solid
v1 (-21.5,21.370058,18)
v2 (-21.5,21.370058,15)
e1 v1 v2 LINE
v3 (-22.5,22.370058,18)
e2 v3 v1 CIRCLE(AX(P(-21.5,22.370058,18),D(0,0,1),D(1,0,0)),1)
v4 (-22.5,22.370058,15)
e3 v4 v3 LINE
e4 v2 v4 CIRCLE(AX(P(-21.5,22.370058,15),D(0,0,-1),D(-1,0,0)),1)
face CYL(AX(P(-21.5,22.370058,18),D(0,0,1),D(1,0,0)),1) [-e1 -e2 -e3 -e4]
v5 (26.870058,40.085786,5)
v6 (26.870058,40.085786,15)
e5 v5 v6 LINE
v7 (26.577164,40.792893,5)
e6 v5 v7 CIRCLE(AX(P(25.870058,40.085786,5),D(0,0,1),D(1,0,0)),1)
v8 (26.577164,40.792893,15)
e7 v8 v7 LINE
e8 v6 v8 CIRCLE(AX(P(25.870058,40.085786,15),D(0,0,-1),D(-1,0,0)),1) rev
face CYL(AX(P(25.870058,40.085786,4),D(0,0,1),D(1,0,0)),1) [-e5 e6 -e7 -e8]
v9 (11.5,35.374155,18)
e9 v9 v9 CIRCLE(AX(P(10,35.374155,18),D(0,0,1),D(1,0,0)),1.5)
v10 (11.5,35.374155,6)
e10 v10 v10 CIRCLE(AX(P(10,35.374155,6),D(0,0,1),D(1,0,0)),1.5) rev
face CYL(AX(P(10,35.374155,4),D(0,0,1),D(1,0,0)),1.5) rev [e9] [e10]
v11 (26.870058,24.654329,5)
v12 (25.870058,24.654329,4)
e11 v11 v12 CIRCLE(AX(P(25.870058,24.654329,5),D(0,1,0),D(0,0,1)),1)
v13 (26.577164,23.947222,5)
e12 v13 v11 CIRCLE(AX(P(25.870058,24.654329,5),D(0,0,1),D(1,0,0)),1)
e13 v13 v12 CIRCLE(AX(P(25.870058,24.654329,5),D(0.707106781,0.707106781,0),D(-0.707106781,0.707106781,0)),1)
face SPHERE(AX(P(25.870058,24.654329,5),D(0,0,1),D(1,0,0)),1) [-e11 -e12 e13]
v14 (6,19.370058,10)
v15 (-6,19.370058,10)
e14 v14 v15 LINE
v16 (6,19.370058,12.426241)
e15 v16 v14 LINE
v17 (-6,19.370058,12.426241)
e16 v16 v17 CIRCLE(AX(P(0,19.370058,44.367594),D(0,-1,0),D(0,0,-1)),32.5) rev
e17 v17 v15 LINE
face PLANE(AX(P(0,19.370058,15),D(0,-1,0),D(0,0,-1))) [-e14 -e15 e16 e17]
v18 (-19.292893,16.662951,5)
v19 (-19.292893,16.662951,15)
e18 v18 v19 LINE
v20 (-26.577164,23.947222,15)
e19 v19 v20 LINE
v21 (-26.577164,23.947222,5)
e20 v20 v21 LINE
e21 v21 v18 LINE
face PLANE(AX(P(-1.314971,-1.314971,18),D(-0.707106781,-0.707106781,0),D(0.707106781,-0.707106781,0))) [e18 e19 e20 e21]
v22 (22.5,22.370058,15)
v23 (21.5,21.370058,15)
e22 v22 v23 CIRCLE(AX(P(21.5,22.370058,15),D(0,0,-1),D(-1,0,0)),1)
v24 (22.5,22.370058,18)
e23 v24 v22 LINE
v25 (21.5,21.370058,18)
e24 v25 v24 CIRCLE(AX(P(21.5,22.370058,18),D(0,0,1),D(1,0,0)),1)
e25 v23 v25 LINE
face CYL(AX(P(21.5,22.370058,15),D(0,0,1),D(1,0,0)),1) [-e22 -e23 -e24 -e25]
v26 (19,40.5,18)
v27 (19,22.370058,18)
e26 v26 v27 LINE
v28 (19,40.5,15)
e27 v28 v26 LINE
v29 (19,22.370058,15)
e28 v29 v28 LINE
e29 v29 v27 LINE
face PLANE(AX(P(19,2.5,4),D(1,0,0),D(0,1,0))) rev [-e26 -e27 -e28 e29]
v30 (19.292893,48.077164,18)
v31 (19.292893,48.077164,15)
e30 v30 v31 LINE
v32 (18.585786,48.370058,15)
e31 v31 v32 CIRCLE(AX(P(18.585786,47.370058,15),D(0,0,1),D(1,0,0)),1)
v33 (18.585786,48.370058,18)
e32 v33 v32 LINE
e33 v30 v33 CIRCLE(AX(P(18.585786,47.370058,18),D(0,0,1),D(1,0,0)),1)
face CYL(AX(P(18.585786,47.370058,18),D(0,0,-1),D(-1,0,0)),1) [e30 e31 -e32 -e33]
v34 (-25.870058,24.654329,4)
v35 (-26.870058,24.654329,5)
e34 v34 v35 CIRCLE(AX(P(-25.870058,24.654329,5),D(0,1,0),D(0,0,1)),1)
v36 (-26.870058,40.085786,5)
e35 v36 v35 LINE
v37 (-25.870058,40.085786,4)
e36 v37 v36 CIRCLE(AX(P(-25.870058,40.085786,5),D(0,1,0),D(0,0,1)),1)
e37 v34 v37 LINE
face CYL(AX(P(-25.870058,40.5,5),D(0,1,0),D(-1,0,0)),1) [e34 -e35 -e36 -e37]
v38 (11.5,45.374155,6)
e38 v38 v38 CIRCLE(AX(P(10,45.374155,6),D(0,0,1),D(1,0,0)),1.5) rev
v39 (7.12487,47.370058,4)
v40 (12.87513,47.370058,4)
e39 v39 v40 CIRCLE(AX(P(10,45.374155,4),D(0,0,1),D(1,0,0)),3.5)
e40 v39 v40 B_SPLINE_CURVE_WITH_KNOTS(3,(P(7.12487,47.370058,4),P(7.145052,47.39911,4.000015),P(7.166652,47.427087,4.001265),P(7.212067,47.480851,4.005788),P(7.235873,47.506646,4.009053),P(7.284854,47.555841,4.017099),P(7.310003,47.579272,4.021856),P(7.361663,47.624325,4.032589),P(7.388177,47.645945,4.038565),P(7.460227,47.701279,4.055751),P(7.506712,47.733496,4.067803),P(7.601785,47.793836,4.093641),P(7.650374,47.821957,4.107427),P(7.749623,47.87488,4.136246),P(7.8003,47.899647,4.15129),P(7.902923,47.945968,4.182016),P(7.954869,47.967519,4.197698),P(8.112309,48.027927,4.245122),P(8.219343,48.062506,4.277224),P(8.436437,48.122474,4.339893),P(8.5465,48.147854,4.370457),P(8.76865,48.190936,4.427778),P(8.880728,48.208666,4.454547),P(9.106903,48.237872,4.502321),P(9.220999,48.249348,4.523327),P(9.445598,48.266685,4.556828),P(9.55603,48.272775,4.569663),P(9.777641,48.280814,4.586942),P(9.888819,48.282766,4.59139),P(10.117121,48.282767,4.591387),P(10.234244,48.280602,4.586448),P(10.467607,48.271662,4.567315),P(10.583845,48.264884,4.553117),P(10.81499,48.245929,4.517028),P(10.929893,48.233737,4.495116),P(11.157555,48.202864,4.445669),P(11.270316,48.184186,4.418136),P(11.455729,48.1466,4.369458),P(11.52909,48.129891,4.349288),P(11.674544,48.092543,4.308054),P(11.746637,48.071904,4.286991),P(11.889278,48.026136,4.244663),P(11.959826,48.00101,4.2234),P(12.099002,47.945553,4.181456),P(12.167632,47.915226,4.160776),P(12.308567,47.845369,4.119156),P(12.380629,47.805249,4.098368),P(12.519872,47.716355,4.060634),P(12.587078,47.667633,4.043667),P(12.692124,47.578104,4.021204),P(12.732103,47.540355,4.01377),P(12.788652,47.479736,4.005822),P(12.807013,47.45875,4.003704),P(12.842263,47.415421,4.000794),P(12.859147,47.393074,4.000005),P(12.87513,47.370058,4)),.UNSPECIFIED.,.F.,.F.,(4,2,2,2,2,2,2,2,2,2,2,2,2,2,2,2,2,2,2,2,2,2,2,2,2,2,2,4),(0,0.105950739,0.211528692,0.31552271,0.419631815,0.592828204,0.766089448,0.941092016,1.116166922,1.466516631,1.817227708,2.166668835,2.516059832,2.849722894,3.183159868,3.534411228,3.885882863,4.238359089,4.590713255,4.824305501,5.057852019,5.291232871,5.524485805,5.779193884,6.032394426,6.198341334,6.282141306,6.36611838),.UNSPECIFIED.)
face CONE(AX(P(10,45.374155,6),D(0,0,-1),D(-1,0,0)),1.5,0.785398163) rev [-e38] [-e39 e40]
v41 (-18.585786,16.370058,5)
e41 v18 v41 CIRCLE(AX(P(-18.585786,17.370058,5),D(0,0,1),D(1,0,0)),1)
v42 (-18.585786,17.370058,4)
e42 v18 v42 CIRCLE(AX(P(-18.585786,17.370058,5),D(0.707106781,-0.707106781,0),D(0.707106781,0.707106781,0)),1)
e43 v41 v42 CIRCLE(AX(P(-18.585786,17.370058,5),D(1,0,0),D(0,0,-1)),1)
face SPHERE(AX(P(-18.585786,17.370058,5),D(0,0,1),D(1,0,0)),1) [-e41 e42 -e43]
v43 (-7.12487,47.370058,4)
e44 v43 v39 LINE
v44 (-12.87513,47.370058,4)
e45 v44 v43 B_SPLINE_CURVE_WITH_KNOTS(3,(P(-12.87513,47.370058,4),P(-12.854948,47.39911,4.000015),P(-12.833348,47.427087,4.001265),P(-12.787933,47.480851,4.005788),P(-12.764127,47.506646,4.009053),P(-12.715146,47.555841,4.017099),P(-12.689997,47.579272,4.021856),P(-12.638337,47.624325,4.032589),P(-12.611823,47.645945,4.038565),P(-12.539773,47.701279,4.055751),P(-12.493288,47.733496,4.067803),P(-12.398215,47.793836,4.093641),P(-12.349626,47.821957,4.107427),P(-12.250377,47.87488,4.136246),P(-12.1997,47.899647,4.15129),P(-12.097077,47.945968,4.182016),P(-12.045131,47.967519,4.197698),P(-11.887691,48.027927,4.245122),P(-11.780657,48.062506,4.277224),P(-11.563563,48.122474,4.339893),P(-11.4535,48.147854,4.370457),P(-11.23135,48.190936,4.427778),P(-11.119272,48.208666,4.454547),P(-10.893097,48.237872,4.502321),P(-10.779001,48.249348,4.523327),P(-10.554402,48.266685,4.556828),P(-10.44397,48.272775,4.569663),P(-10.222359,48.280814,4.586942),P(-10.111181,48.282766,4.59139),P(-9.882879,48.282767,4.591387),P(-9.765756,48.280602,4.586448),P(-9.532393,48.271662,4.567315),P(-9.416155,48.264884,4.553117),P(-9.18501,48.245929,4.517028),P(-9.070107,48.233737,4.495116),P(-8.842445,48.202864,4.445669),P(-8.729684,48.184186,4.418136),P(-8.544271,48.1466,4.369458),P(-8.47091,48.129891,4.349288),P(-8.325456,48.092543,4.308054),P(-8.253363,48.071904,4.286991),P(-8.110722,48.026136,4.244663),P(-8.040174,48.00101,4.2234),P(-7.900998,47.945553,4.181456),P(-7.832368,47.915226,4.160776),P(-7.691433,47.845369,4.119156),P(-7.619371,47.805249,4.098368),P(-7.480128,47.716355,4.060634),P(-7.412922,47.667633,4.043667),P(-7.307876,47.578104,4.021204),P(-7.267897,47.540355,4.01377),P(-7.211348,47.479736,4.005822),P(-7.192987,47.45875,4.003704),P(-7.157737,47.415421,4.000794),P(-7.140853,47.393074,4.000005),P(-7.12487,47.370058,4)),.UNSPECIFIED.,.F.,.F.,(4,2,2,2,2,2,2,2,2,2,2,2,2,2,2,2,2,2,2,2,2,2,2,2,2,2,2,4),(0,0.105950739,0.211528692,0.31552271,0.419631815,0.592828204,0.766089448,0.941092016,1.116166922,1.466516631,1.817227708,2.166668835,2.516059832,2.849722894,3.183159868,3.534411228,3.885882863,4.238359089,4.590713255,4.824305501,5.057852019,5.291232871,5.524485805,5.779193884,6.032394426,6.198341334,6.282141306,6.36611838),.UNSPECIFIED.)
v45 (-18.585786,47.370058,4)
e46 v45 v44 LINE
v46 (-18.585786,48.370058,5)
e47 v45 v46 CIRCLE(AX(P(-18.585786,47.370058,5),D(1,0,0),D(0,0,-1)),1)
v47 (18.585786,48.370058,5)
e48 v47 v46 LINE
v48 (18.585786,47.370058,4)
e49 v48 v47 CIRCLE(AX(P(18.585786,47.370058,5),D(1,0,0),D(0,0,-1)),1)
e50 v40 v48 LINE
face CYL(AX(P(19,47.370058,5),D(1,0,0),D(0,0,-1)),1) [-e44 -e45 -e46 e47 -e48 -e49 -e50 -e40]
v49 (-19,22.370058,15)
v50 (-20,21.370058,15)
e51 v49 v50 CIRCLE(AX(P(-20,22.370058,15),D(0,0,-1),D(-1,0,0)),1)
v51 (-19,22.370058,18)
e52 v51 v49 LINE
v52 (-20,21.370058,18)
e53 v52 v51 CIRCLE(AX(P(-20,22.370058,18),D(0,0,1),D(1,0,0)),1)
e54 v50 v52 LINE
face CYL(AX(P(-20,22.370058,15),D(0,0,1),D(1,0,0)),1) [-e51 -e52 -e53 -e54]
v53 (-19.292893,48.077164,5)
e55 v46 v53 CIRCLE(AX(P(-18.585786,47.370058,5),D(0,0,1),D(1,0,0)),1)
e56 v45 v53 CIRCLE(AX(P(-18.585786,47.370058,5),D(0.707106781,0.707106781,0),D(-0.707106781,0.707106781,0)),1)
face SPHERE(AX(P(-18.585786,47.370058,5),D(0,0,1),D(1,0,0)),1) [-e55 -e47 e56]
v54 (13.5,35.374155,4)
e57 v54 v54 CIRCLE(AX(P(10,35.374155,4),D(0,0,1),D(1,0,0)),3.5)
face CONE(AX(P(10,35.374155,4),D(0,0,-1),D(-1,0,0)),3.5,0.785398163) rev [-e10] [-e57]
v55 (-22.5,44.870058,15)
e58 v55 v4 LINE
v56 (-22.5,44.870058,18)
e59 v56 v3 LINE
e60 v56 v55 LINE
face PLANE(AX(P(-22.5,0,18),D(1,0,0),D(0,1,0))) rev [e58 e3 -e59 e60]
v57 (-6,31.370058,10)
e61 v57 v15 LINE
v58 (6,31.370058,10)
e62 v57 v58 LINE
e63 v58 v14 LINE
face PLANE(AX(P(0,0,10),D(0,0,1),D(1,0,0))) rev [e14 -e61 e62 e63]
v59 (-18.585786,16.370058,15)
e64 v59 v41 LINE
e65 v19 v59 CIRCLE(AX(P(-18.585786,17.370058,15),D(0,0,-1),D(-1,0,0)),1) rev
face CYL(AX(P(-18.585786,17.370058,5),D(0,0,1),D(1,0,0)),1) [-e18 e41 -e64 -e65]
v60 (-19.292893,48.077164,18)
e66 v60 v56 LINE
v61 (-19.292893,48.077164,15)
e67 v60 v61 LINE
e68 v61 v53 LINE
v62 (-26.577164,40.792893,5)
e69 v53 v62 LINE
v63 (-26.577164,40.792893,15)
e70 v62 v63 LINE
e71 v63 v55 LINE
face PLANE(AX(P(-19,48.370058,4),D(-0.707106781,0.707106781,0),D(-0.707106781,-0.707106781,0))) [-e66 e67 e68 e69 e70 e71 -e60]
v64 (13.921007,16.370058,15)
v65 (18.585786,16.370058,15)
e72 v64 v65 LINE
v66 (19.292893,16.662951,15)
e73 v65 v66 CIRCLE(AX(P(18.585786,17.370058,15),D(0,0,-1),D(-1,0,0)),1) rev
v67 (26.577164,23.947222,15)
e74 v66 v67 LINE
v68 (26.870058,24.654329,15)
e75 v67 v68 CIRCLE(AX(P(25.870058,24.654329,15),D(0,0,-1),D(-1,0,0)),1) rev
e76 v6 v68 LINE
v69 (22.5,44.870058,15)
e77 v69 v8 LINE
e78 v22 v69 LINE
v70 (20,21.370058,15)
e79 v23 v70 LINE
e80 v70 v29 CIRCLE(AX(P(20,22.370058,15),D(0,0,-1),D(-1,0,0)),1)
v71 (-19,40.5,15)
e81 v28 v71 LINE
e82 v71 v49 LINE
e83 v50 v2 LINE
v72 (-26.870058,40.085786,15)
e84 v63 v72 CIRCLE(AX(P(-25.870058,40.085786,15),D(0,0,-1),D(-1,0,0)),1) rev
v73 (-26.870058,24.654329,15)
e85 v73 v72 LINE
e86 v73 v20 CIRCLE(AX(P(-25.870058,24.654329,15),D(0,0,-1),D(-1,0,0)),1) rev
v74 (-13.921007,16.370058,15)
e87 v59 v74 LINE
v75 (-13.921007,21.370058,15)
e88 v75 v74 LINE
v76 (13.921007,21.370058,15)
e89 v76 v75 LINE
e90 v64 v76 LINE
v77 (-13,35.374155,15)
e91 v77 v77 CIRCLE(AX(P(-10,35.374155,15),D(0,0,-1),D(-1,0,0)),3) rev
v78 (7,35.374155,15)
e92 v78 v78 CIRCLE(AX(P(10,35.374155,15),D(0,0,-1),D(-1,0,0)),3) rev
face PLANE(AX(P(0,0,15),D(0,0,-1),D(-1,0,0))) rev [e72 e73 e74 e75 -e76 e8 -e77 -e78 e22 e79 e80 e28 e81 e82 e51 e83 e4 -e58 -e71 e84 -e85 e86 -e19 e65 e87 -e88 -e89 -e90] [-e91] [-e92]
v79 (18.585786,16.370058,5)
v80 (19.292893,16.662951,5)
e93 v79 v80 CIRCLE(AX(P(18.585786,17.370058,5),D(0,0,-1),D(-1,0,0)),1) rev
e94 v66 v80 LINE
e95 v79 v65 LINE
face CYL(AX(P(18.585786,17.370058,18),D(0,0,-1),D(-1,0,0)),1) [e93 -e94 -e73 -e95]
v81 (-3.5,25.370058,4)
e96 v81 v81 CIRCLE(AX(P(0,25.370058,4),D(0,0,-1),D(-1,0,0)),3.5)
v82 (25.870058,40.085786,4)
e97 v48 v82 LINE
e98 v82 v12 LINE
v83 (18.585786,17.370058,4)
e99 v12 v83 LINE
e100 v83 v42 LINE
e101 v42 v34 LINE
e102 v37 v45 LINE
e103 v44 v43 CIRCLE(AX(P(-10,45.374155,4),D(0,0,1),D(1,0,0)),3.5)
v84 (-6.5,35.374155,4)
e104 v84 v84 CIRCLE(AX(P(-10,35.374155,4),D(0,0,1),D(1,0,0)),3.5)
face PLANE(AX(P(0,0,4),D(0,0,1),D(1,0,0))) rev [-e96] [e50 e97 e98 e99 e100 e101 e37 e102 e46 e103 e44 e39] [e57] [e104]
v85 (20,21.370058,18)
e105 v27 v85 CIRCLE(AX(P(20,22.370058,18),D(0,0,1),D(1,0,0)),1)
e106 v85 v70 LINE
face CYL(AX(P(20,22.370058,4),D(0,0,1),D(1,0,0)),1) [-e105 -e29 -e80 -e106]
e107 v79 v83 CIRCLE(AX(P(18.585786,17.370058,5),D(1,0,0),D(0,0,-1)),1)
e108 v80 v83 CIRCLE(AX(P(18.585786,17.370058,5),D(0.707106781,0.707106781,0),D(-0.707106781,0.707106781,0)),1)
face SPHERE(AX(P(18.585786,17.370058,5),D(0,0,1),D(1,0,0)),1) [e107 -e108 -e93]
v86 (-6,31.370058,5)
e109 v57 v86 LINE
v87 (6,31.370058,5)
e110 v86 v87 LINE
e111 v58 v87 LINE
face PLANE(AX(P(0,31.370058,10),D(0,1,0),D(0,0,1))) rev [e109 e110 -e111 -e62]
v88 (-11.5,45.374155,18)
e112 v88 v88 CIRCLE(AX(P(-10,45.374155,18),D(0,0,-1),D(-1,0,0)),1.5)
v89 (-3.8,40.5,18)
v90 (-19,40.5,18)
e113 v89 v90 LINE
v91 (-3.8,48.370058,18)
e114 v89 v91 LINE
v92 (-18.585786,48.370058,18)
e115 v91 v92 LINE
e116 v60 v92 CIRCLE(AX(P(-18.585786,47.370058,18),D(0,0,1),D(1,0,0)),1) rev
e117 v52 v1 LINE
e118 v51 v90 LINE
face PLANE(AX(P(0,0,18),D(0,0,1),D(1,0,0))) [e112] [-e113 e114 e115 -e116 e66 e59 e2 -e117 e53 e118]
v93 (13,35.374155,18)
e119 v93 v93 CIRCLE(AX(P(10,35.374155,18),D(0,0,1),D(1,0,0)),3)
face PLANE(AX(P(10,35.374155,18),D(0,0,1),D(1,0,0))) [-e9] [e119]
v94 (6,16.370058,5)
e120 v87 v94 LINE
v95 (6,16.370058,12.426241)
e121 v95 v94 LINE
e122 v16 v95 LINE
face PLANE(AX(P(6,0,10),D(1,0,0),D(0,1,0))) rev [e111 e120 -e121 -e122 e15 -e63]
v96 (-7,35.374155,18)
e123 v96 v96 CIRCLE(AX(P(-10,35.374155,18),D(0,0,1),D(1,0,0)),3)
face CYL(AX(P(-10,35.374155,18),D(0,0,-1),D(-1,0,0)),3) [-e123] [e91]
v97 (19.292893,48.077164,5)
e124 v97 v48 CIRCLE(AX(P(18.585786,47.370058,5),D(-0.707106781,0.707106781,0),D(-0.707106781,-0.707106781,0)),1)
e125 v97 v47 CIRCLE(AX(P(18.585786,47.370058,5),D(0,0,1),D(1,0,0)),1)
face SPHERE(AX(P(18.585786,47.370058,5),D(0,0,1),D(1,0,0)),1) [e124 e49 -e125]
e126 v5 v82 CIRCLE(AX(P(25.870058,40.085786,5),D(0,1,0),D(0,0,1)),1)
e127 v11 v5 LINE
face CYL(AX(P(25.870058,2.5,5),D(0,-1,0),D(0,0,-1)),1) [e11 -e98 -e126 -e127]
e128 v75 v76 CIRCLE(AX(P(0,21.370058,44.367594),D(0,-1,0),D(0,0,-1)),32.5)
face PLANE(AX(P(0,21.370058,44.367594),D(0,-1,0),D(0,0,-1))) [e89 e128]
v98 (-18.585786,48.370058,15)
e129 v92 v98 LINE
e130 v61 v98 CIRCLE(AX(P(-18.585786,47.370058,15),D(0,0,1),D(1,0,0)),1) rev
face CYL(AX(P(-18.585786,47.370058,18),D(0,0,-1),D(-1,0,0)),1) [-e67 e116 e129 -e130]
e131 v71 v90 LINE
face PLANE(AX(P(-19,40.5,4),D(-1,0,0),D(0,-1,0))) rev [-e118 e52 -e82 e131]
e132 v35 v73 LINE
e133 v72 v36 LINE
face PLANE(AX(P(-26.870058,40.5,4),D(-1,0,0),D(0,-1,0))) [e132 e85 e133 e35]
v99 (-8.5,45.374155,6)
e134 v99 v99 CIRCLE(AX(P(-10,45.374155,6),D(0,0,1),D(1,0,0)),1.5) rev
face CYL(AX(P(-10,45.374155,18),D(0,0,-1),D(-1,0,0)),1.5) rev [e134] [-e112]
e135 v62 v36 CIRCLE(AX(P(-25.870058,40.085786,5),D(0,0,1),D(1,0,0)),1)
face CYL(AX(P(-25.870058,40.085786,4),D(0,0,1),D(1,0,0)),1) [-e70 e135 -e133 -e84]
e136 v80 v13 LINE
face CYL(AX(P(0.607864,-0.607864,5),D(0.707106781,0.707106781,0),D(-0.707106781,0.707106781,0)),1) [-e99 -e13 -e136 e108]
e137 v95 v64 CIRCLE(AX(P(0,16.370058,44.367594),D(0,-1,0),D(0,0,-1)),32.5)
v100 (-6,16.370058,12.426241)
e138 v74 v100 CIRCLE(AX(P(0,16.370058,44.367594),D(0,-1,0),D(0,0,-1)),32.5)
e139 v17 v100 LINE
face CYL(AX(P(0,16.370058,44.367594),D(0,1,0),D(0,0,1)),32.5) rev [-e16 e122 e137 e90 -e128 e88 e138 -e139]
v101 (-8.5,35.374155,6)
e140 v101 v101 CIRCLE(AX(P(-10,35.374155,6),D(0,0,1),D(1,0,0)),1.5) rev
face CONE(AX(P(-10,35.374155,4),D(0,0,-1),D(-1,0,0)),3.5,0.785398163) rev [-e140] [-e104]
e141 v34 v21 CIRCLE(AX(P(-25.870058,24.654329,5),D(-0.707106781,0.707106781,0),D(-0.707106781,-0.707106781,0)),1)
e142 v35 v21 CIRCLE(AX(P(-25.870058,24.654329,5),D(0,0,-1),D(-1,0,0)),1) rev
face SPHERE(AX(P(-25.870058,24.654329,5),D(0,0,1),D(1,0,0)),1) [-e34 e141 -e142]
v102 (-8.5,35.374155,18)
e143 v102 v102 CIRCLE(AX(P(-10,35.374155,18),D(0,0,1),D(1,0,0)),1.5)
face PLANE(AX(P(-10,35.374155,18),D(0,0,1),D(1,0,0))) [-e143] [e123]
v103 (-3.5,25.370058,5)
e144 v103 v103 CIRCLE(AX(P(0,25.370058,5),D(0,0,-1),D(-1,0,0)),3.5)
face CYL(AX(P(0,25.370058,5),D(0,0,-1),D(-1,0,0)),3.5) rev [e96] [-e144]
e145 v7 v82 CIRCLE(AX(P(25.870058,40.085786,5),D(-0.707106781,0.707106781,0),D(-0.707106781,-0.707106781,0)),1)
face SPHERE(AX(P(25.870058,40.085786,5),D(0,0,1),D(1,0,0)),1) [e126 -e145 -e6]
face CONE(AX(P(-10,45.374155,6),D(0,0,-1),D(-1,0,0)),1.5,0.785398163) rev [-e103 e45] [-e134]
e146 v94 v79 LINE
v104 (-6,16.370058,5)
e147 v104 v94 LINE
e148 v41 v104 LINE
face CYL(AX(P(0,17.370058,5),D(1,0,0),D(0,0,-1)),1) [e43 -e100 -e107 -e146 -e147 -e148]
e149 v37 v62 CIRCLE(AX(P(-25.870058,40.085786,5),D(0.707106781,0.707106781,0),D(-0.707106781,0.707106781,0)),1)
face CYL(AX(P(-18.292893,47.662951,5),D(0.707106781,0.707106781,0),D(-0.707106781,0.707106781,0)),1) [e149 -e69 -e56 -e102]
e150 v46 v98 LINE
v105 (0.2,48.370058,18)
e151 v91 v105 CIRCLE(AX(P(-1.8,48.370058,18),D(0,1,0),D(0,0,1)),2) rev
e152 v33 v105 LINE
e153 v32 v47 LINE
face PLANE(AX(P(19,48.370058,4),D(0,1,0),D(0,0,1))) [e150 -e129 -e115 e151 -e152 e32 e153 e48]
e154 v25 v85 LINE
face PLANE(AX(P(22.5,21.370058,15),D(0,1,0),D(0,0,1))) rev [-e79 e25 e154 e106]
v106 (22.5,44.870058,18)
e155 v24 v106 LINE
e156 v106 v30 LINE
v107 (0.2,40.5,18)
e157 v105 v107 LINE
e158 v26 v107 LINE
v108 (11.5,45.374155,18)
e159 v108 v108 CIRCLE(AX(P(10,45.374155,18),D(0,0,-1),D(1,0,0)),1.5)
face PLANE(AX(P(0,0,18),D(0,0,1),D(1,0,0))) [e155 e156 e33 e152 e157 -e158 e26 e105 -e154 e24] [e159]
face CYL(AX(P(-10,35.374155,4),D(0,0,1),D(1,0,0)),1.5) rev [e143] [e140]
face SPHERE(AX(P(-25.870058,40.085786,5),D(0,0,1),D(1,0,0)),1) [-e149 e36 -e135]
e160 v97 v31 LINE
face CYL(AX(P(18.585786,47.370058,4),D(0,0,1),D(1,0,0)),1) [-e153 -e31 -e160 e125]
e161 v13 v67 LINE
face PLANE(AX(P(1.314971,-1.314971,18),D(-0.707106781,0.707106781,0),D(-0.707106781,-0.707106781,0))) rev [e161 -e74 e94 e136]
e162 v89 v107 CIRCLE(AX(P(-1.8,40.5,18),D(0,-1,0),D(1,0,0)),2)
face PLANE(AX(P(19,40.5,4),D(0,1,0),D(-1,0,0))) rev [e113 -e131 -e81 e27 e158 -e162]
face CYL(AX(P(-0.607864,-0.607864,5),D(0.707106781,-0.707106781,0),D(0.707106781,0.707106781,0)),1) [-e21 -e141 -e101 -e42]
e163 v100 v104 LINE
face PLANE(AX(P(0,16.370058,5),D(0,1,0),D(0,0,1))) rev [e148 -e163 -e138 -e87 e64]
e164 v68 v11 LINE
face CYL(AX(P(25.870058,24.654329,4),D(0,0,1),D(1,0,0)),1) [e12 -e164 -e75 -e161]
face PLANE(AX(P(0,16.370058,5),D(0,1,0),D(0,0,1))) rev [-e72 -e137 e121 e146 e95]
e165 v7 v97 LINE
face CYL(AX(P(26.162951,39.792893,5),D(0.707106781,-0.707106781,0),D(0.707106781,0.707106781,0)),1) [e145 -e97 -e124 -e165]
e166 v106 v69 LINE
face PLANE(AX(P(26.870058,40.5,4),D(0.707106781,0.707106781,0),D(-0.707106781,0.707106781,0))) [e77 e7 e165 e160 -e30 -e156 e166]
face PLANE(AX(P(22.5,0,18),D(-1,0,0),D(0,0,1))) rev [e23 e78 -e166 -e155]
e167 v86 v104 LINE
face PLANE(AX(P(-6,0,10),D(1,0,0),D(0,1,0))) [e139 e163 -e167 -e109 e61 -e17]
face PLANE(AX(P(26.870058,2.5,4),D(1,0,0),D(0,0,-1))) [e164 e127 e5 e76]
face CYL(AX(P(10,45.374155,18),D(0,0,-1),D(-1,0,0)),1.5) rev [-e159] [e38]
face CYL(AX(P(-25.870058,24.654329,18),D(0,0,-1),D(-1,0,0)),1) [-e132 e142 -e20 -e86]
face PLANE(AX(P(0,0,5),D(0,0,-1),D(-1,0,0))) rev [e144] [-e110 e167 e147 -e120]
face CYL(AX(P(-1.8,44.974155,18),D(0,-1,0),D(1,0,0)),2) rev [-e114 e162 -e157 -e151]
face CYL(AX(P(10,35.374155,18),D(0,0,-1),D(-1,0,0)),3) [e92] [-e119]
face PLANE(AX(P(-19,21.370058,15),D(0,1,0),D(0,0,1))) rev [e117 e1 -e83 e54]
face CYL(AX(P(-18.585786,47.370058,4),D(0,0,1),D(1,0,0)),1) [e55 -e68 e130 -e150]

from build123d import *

# Parameters (mm, degrees)
CROQUIS3_W                   = 38
CROQUIS3_H                   = 38
SALIENTE_EXTRUIR9_DEPTH      = 1
SALIENTE_EXTRUIR10_START     = -11
SALIENTE_EXTRUIR10_OUTLINE_W = 38
SALIENTE_EXTRUIR10_OUTLINE_H = 38
SALIENTE_EXTRUIR10_DEPTH     = 10
CROQUIS13_W                  = 38
CROQUIS13_H                  = 38
SALIENTE_EXTRUIR15_DEPTH     = 3
CROQUIS14_R                  = 1.5
CORTAR_EXTRUIR1_DEPTH        = 14
CROQUIS15_W                  = 38
CROQUIS15_H                  = 24.129942315
CROQUIS15_R                  = 3.5
SALIENTE_EXTRUIR16_DEPTH     = 1
CORTAR_EXTRUIR2_DEPTH        = 14
SALIENTE_EXTRUIR17_DEPTH     = 5
SALIENTE_EXTRUIR18_DEPTH     = 5
CORTAR_EXTRUIR3_DEPTH        = 3
REDONDEO11_R                 = 1
CROQUIS21_R                  = 1.5
CORTAR_EXTRUIR4_DEPTH        = 11
SALIENTE_EXTRUIR20_START     = 3
CROQUIS22_R                  = 3
CROQUIS22_R_2                = 1.5
SALIENTE_EXTRUIR20_DEPTH     = 3
CHAFL_N1_SIZE                = 2
REDONDEO12_R                 = 1
CORTAR_EXTRUIR5_DEPTH        = 5
REDONDEO13_R                 = 1


# Read off the part's stored shape, not the designer's step: Saliente-Extruir10
with BuildPart() as part:
    # Croquis3 → Saliente-Extruir9 (new body)
    with BuildSketch(Plane.XY.offset(5)):
        Polygon((19, -5.370057685), (26.870057685, 2.5), (26.870057685, 40.5), (19, 48.370057685), (-19, 48.370057685), (-26.870057685, 40.5), (-26.870057685, 2.5), (-19, -5.370057685), align=None)
        with Locations((0, 21.5)):
            Rectangle(CROQUIS3_W, CROQUIS3_H, mode=Mode.SUBTRACT)
    extrude(amount=-SALIENTE_EXTRUIR9_DEPTH)

    # Saliente-Extruir10 outline → Saliente-Extruir10 (add)
    with BuildSketch(Plane(origin=(0, 0, 4), x_dir=(-1, 0, 0), z_dir=(0, 0, -1)).offset(SALIENTE_EXTRUIR10_START)):
        Polygon((-26.870057685, 2.5), (-19, -5.370057685), (19, -5.370057685), (26.870057685, 2.5), (26.870057685, 40.5), (19, 48.370057685), (-19, 48.370057685), (-26.870057685, 40.5), align=None)
        with Locations((0, 21.5)):
            Rectangle(SALIENTE_EXTRUIR10_OUTLINE_W, SALIENTE_EXTRUIR10_OUTLINE_H, mode=Mode.SUBTRACT)
    extrude(amount=SALIENTE_EXTRUIR10_DEPTH)

    # Croquis13 → Saliente-Extruir15 (add)
    with BuildSketch(Plane.XY.offset(15)):
        with BuildLine():
            Line((-22.5, 44.870057685), (-22.5, -1))
            Line((-22.5, -1), (22.5, -1))
            Line((22.5, -1), (22.5, 44.870057685))
            Line((22.5, 44.870057685), (19.292893219, 48.077164466))
            ThreePointArc((19.292893219, 48.077164466), (18.96846987, 48.293937218), (18.585786438, 48.370057685))
            Line((18.585786438, 48.370057685), (-18.585786438, 48.370057685))
            ThreePointArc((-18.585786438, 48.370057685), (-18.96846987, 48.293937218), (-19.292893219, 48.077164466))
            Line((-19.292893219, 48.077164466), (-22.5, 44.870057685))
        make_face()
        with Locations((0, 21.5)):
            Rectangle(CROQUIS13_W, CROQUIS13_H, mode=Mode.SUBTRACT)
    extrude(amount=SALIENTE_EXTRUIR15_DEPTH)

    # Croquis14 → Cortar-Extruir1 (cut)
    with BuildSketch(Plane(origin=(0, 0, 4), x_dir=(-1, 0, 0), z_dir=(0, 0, -1))):
        with Locations((10, 45.37415474)):
            Circle(CROQUIS14_R)
        with Locations(Location((-10, 45.37415474, 0), (0, 0, 180))):
            Circle(CROQUIS14_R)
    extrude(amount=-CORTAR_EXTRUIR1_DEPTH, mode=Mode.SUBTRACT)

    # Croquis15 → Saliente-Extruir16 (add)
    with BuildSketch(Plane(origin=(0, 0, 4), x_dir=(-1, 0, 0), z_dir=(0, 0, -1))):
        with Locations((0, 28.435028843)):
            Rectangle(CROQUIS15_W, CROQUIS15_H)
        with Locations((0, 25.370057685)):
            Circle(CROQUIS15_R, mode=Mode.SUBTRACT)
    extrude(amount=-SALIENTE_EXTRUIR16_DEPTH)

    # Croquis16 → Cortar-Extruir2 (cut)
    with BuildSketch(Plane(origin=(0, 0, 4), x_dir=(-1, 0, 0), z_dir=(0, 0, -1))):
        Polygon((-19, 2.5), (-19, 16.370057685), (-26.870057685, 24.24011537), (-26.870057685, 2.5), (-19, -5.370057685), (19, -5.370057685), (26.870057685, 2.5), (26.870057685, 24.24011537), (19, 16.370057685), (19, 2.5), align=None)
    extrude(amount=-CORTAR_EXTRUIR2_DEPTH, mode=Mode.SUBTRACT)

    # Croquis17 → Saliente-Extruir17 (add)
    with BuildSketch(Plane.XY.offset(5)):
        Polygon((6, 31.370057685), (6, 25.370057685), (6, 19.370057685), (6, 16.370057685), (19, 16.370057685), (19, 40.5), (-19, 40.5), (-19, 16.370057685), (-6, 16.370057685), (-6, 19.370057685), (-6, 31.370057685), align=None)
    extrude(amount=SALIENTE_EXTRUIR17_DEPTH)

    # Croquis18 → Saliente-Extruir18 (add)
    with BuildSketch(Plane.XY.offset(10)):
        Polygon((-19, 40.5), (-19, 16.370057685), (-6, 16.370057685), (-6, 19.370057685), (6, 19.370057685), (6, 16.370057685), (19, 16.370057685), (19, 40.5), align=None)
    extrude(amount=SALIENTE_EXTRUIR18_DEPTH)

    # Croquis19 → Cortar-Extruir3 (cut)
    with BuildSketch(Plane.XY.offset(18)):
        Polygon((-22.5, 19.870057685), (-19, 16.370057685), (-19, 21.370057685), (-22.5, 21.370057685), align=None)
        Polygon((19, 16.370057685), (22.5, 19.870057685), (22.5, 21.370057685), (19, 21.370057685), align=None)
    extrude(amount=-CORTAR_EXTRUIR3_DEPTH, mode=Mode.SUBTRACT)

    # Redondeo11
    redondeo11_edges = [part.edges().sort_by_distance(p)[0] for p in [
        (26.870057685, 40.5, 10),
        (19, 48.370057685, 10),
        (-19, 48.370057685, 10),
        (-26.870057685, 40.5, 10),
        (26.870057685, 24.24011537, 9.5),
        (19, 16.370057685, 9.5),
        (-26.870057685, 24.24011537, 9.5),
        (-19, 16.370057685, 9.5),
    ]]
    fillet(redondeo11_edges, radius=REDONDEO11_R)

    # Croquis21 → Cortar-Extruir4 (cut)
    with BuildSketch(Plane.XY.offset(15)):
        with Locations((-10, 35.37415474)):
            Circle(CROQUIS21_R)
        with Locations((10, 35.37415474)):
            Circle(CROQUIS21_R)
    extrude(amount=-CORTAR_EXTRUIR4_DEPTH, mode=Mode.SUBTRACT)

    # Croquis22 → Saliente-Extruir20 (add)
    # profile 1 of 2: a face of its own
    with BuildSketch(Plane.XY.offset(15).offset(SALIENTE_EXTRUIR20_START)):
        with Locations(Location((-10, 35.37415474, 0), (0, 0, 180))):
            Circle(CROQUIS22_R)
        with Locations((-10, 35.37415474)):
            Circle(CROQUIS22_R_2, mode=Mode.SUBTRACT)
    # profile 2 of 2: a face of its own
    with BuildSketch(Plane.XY.offset(15).offset(SALIENTE_EXTRUIR20_START)):
        with Locations(Location((10, 35.37415474, 0), (0, 0, 180))):
            Circle(CROQUIS22_R)
        with Locations((10, 35.37415474)):
            Circle(CROQUIS22_R_2, mode=Mode.SUBTRACT)
    extrude(amount=-SALIENTE_EXTRUIR20_DEPTH)

    # Croquis23 → Cortar-Revolución1 (revolve, cut)
    with BuildSketch(Plane.XY.offset(18)):
        Polygon((-1.8, 48.370057685), (-1.8, 44.97415474), (-1.8, 40.5), (0.2, 40.5), (0.2, 48.370057685), align=None)
    revolve(axis=Axis((-1.8, 44.97415474, 18), (0, 1, 0)), mode=Mode.SUBTRACT)

    # Chaflán1
    # the kernel refuses this chamfer: 2 mm, written as the material it takes off along each edge
    with BuildSketch(Plane(origin=(-10, 45.37415474, 4), x_dir=(-1, 0, 0), z_dir=(0, -1, 0))) as chafl_n1_piece_1:
        Polygon((1.5 + CHAFL_N1_SIZE, 0), (1.5, -CHAFL_N1_SIZE), (1.5, 0), align=None)
    revolve(axis=Axis((-10, 45.37415474, 4), (0, 0, -1)), mode=Mode.SUBTRACT)
    with BuildSketch(Plane(origin=(10, 45.37415474, 4), x_dir=(1, 0, 0), z_dir=(0, 1, 0))) as chafl_n1_piece_2:
        Polygon((1.5 + CHAFL_N1_SIZE, 0), (1.5, -CHAFL_N1_SIZE), (1.5, 0), align=None)
    revolve(axis=Axis((10, 45.37415474, 4), (0, 0, -1)), mode=Mode.SUBTRACT)
    with BuildSketch(Plane(origin=(-10, 35.37415474, 4), x_dir=(1, 0, 0), z_dir=(0, -1, 0))) as chafl_n1_piece_3:
        Polygon((1.5 + CHAFL_N1_SIZE, 0), (1.5, CHAFL_N1_SIZE), (1.5, 0), align=None)
    revolve(axis=Axis((-10, 35.37415474, 4), (0, 0, 1)), mode=Mode.SUBTRACT)
    with BuildSketch(Plane(origin=(10, 35.37415474, 4), x_dir=(1, 0, 0), z_dir=(0, -1, 0))) as chafl_n1_piece_4:
        Polygon((1.5 + CHAFL_N1_SIZE, 0), (1.5, CHAFL_N1_SIZE), (1.5, 0), align=None)
    revolve(axis=Axis((10, 35.37415474, 4), (0, 0, 1)), mode=Mode.SUBTRACT)

    # Redondeo12
    # the kernel refuses this fillet: 1 mm, written as the material it takes off along each edge
    with BuildSketch(Plane(origin=(26.870057685, 24.654328933, 4), x_dir=(-1, 0, 0), z_dir=(0, 1, 0)), Plane(origin=(-26.870057685, 40.085786438, 4), x_dir=(1, 0, 0), z_dir=(0, -1, 0))) as redondeo12_piece_1:
        with BuildLine():
            CenterArc((REDONDEO12_R, REDONDEO12_R), REDONDEO12_R, 180, 90)
            Line((0, REDONDEO12_R), (0, 0))
            Line((0, 0), (REDONDEO12_R, 0))
        make_face()
    extrude(amount=15.431457505, mode=Mode.SUBTRACT)
    with BuildSketch(Plane(origin=(26.577164466, 40.792893219, 4), x_dir=(-0.7071067811865461, -0.707106781186549, 0), z_dir=(-0.707106781186549, 0.7071067811865461, 0)), Plane(origin=(-26.577164466, 23.947222151, 4), x_dir=(0.7071067811865487, 0.7071067811865465, 0), z_dir=(0.7071067811865465, -0.7071067811865487, 0)), Plane(origin=(-19.292893219, 48.077164466, 4), x_dir=(0.7071067811865487, -0.7071067811865465, 0), z_dir=(-0.7071067811865465, -0.7071067811865487, 0)), Plane(origin=(19.292893219, 16.662950904, 4), x_dir=(-0.7071067811865485, 0.7071067811865467, 0), z_dir=(0.7071067811865466, 0.7071067811865485, 0))) as redondeo12_piece_2:
        with BuildLine():
            CenterArc((REDONDEO12_R, REDONDEO12_R), REDONDEO12_R, 180, 90)
            Line((0, REDONDEO12_R), (0, 0))
            Line((0, 0), (REDONDEO12_R, 0))
        make_face()
    extrude(amount=10.30151519, mode=Mode.SUBTRACT)
    with BuildSketch(Plane(origin=(18.585786438, 48.370057685, 4), x_dir=(0, -1, 0), z_dir=(-1, 0, 0)), Plane(origin=(-9.309576067, 48.370057685, 4), x_dir=(0, -1, 0), z_dir=(-1, 0, 0))) as redondeo12_piece_3:
        with BuildLine():
            CenterArc((REDONDEO12_R, REDONDEO12_R), REDONDEO12_R, 180, 90)
            Line((0, REDONDEO12_R), (0, 0))
            Line((0, 0), (REDONDEO12_R, 0))
        make_face()
    extrude(amount=9.276210371, mode=Mode.SUBTRACT)
    with BuildSketch(Plane(origin=(18.585786438, 16.370057685, 4), x_dir=(0, 1, 0), z_dir=(-1, 0, 0))) as redondeo12_piece_4:
        with BuildLine():
            CenterArc((REDONDEO12_R, -REDONDEO12_R), REDONDEO12_R, 90, 90)
            Line((0, -REDONDEO12_R), (0, 0))
            Line((0, 0), (REDONDEO12_R, 0))
        make_face()
    extrude(amount=37.171572875, mode=Mode.SUBTRACT)
    with BuildSketch(Plane(origin=(-18.585786438, 17.370057685, 4), x_dir=(-0.7071067811865493, -0.7071067811865458, 0), z_dir=(-0.7071067811865458, 0.7071067811865493, 0))) as redondeo12_piece_5:
        with BuildLine():
            CenterArc((1 - REDONDEO12_R, REDONDEO12_R), REDONDEO12_R, 270, 90)
            Line((1, REDONDEO12_R), (1, 0))
            Line((1, 0), (1 - REDONDEO12_R, 0))
        make_face()
    revolve(axis=Axis((-18.585786438, 17.370057685, 4), (0, 0, 1)), revolution_arc=45, mode=Mode.SUBTRACT)
    with BuildSketch(Plane(origin=(-25.870057685, 24.654328933, 4), x_dir=(-1, 0, 0), z_dir=(0, 1, 0))) as redondeo12_piece_6:
        with BuildLine():
            CenterArc((1 - REDONDEO12_R, REDONDEO12_R), REDONDEO12_R, 270, 90)
            Line((1, REDONDEO12_R), (1, 0))
            Line((1, 0), (1 - REDONDEO12_R, 0))
        make_face()
    revolve(axis=Axis((-25.870057685, 24.654328933, 4), (0, 0, 1)), revolution_arc=45, mode=Mode.SUBTRACT)
    with BuildSketch(Plane(origin=(18.585786438, 17.370057685, 4), x_dir=(0, -1, 0), z_dir=(-1, 0, 0))) as redondeo12_piece_7:
        with BuildLine():
            CenterArc((1 - REDONDEO12_R, REDONDEO12_R), REDONDEO12_R, 270, 90)
            Line((1, REDONDEO12_R), (1, 0))
            Line((1, 0), (1 - REDONDEO12_R, 0))
        make_face()
    revolve(axis=Axis((18.585786438, 17.370057685, 4), (0, 0, 1)), revolution_arc=45, mode=Mode.SUBTRACT)
    with BuildSketch(Plane(origin=(25.870057685, 24.654328933, 4), x_dir=(1, 0, 0), z_dir=(0, 1, 0))) as redondeo12_piece_8:
        with BuildLine():
            CenterArc((1 - REDONDEO12_R, -REDONDEO12_R), REDONDEO12_R, 0, 90)
            Line((1, -REDONDEO12_R), (1, 0))
            Line((1, 0), (1 - REDONDEO12_R, 0))
        make_face()
    revolve(axis=Axis((25.870057685, 24.654328933, 4), (0, 0, -1)), revolution_arc=45, mode=Mode.SUBTRACT)
    with BuildSketch(Plane(origin=(-25.870057685, 40.085786438, 4), x_dir=(-0.7071067811865493, 0.7071067811865458, 0), z_dir=(0.7071067811865458, 0.7071067811865493, 0))) as redondeo12_piece_9:
        with BuildLine():
            CenterArc((1 - REDONDEO12_R, REDONDEO12_R), REDONDEO12_R, 270, 90)
            Line((1, REDONDEO12_R), (1, 0))
            Line((1, 0), (1 - REDONDEO12_R, 0))
        make_face()
    revolve(axis=Axis((-25.870057685, 40.085786438, 4), (0, 0, 1)), revolution_arc=45, mode=Mode.SUBTRACT)
    with BuildSketch(Plane(origin=(-18.585786438, 47.370057685, 4), x_dir=(0, 1, 0), z_dir=(1, 0, 0))) as redondeo12_piece_10:
        with BuildLine():
            CenterArc((1 - REDONDEO12_R, REDONDEO12_R), REDONDEO12_R, 270, 90)
            Line((1, REDONDEO12_R), (1, 0))
            Line((1, 0), (1 - REDONDEO12_R, 0))
        make_face()
    revolve(axis=Axis((-18.585786438, 47.370057685, 4), (0, 0, 1)), revolution_arc=45, mode=Mode.SUBTRACT)
    with BuildSketch(Plane(origin=(18.585786438, 47.370057685, 4), x_dir=(0.7071067811865476, 0.7071067811865476, 0), z_dir=(0.7071067811865476, -0.7071067811865476, 0))) as redondeo12_piece_11:
        with BuildLine():
            CenterArc((1 - REDONDEO12_R, REDONDEO12_R), REDONDEO12_R, 270, 90)
            Line((1, REDONDEO12_R), (1, 0))
            Line((1, 0), (1 - REDONDEO12_R, 0))
        make_face()
    revolve(axis=Axis((18.585786438, 47.370057685, 4), (0, 0, 1)), revolution_arc=45, mode=Mode.SUBTRACT)
    with BuildSketch(Plane(origin=(25.870057685, 40.085786438, 4), x_dir=(1, 0, 0), z_dir=(0, -1, 0))) as redondeo12_piece_12:
        with BuildLine():
            CenterArc((1 - REDONDEO12_R, REDONDEO12_R), REDONDEO12_R, 270, 90)
            Line((1, REDONDEO12_R), (1, 0))
            Line((1, 0), (1 - REDONDEO12_R, 0))
        make_face()
    revolve(axis=Axis((25.870057685, 40.085786438, 4), (0, 0, 1)), revolution_arc=45, mode=Mode.SUBTRACT)
    with BuildSketch(Plane(origin=(10.690423933, 48.370057685, 4), x_dir=(0, -1, 0), z_dir=(-1, 0, 0))) as redondeo12_piece_13:
        with BuildLine():
            CenterArc((REDONDEO12_R, REDONDEO12_R), REDONDEO12_R, 180, 90)
            Line((0, REDONDEO12_R), (0, 0))
            Line((0, 0), (REDONDEO12_R, 0))
        make_face()
    extrude(amount=21.380847867, mode=Mode.SUBTRACT)

    # Croquis24 → Cortar-Extruir5 (cut)
    with BuildSketch(Plane.XZ.offset(-21.370057685)):
        with BuildLine():
            Line((-19, 18), (19, 18))
            ThreePointArc((19, 18), (0, 11.867593747), (-19, 18))
        make_face()
    extrude(amount=CORTAR_EXTRUIR5_DEPTH, mode=Mode.SUBTRACT)

    # Redondeo13
    redondeo13_edges = [part.edges().sort_by_distance(p)[0] for p in [
        (22.5, 21.370057685, 16.5),
        (19, 21.370057685, 16.5),
        (-19, 21.370057685, 16.5),
        (-22.5, 21.370057685, 16.5),
    ]]
    fillet(redondeo13_edges, radius=REDONDEO13_R)


solid = part.part
